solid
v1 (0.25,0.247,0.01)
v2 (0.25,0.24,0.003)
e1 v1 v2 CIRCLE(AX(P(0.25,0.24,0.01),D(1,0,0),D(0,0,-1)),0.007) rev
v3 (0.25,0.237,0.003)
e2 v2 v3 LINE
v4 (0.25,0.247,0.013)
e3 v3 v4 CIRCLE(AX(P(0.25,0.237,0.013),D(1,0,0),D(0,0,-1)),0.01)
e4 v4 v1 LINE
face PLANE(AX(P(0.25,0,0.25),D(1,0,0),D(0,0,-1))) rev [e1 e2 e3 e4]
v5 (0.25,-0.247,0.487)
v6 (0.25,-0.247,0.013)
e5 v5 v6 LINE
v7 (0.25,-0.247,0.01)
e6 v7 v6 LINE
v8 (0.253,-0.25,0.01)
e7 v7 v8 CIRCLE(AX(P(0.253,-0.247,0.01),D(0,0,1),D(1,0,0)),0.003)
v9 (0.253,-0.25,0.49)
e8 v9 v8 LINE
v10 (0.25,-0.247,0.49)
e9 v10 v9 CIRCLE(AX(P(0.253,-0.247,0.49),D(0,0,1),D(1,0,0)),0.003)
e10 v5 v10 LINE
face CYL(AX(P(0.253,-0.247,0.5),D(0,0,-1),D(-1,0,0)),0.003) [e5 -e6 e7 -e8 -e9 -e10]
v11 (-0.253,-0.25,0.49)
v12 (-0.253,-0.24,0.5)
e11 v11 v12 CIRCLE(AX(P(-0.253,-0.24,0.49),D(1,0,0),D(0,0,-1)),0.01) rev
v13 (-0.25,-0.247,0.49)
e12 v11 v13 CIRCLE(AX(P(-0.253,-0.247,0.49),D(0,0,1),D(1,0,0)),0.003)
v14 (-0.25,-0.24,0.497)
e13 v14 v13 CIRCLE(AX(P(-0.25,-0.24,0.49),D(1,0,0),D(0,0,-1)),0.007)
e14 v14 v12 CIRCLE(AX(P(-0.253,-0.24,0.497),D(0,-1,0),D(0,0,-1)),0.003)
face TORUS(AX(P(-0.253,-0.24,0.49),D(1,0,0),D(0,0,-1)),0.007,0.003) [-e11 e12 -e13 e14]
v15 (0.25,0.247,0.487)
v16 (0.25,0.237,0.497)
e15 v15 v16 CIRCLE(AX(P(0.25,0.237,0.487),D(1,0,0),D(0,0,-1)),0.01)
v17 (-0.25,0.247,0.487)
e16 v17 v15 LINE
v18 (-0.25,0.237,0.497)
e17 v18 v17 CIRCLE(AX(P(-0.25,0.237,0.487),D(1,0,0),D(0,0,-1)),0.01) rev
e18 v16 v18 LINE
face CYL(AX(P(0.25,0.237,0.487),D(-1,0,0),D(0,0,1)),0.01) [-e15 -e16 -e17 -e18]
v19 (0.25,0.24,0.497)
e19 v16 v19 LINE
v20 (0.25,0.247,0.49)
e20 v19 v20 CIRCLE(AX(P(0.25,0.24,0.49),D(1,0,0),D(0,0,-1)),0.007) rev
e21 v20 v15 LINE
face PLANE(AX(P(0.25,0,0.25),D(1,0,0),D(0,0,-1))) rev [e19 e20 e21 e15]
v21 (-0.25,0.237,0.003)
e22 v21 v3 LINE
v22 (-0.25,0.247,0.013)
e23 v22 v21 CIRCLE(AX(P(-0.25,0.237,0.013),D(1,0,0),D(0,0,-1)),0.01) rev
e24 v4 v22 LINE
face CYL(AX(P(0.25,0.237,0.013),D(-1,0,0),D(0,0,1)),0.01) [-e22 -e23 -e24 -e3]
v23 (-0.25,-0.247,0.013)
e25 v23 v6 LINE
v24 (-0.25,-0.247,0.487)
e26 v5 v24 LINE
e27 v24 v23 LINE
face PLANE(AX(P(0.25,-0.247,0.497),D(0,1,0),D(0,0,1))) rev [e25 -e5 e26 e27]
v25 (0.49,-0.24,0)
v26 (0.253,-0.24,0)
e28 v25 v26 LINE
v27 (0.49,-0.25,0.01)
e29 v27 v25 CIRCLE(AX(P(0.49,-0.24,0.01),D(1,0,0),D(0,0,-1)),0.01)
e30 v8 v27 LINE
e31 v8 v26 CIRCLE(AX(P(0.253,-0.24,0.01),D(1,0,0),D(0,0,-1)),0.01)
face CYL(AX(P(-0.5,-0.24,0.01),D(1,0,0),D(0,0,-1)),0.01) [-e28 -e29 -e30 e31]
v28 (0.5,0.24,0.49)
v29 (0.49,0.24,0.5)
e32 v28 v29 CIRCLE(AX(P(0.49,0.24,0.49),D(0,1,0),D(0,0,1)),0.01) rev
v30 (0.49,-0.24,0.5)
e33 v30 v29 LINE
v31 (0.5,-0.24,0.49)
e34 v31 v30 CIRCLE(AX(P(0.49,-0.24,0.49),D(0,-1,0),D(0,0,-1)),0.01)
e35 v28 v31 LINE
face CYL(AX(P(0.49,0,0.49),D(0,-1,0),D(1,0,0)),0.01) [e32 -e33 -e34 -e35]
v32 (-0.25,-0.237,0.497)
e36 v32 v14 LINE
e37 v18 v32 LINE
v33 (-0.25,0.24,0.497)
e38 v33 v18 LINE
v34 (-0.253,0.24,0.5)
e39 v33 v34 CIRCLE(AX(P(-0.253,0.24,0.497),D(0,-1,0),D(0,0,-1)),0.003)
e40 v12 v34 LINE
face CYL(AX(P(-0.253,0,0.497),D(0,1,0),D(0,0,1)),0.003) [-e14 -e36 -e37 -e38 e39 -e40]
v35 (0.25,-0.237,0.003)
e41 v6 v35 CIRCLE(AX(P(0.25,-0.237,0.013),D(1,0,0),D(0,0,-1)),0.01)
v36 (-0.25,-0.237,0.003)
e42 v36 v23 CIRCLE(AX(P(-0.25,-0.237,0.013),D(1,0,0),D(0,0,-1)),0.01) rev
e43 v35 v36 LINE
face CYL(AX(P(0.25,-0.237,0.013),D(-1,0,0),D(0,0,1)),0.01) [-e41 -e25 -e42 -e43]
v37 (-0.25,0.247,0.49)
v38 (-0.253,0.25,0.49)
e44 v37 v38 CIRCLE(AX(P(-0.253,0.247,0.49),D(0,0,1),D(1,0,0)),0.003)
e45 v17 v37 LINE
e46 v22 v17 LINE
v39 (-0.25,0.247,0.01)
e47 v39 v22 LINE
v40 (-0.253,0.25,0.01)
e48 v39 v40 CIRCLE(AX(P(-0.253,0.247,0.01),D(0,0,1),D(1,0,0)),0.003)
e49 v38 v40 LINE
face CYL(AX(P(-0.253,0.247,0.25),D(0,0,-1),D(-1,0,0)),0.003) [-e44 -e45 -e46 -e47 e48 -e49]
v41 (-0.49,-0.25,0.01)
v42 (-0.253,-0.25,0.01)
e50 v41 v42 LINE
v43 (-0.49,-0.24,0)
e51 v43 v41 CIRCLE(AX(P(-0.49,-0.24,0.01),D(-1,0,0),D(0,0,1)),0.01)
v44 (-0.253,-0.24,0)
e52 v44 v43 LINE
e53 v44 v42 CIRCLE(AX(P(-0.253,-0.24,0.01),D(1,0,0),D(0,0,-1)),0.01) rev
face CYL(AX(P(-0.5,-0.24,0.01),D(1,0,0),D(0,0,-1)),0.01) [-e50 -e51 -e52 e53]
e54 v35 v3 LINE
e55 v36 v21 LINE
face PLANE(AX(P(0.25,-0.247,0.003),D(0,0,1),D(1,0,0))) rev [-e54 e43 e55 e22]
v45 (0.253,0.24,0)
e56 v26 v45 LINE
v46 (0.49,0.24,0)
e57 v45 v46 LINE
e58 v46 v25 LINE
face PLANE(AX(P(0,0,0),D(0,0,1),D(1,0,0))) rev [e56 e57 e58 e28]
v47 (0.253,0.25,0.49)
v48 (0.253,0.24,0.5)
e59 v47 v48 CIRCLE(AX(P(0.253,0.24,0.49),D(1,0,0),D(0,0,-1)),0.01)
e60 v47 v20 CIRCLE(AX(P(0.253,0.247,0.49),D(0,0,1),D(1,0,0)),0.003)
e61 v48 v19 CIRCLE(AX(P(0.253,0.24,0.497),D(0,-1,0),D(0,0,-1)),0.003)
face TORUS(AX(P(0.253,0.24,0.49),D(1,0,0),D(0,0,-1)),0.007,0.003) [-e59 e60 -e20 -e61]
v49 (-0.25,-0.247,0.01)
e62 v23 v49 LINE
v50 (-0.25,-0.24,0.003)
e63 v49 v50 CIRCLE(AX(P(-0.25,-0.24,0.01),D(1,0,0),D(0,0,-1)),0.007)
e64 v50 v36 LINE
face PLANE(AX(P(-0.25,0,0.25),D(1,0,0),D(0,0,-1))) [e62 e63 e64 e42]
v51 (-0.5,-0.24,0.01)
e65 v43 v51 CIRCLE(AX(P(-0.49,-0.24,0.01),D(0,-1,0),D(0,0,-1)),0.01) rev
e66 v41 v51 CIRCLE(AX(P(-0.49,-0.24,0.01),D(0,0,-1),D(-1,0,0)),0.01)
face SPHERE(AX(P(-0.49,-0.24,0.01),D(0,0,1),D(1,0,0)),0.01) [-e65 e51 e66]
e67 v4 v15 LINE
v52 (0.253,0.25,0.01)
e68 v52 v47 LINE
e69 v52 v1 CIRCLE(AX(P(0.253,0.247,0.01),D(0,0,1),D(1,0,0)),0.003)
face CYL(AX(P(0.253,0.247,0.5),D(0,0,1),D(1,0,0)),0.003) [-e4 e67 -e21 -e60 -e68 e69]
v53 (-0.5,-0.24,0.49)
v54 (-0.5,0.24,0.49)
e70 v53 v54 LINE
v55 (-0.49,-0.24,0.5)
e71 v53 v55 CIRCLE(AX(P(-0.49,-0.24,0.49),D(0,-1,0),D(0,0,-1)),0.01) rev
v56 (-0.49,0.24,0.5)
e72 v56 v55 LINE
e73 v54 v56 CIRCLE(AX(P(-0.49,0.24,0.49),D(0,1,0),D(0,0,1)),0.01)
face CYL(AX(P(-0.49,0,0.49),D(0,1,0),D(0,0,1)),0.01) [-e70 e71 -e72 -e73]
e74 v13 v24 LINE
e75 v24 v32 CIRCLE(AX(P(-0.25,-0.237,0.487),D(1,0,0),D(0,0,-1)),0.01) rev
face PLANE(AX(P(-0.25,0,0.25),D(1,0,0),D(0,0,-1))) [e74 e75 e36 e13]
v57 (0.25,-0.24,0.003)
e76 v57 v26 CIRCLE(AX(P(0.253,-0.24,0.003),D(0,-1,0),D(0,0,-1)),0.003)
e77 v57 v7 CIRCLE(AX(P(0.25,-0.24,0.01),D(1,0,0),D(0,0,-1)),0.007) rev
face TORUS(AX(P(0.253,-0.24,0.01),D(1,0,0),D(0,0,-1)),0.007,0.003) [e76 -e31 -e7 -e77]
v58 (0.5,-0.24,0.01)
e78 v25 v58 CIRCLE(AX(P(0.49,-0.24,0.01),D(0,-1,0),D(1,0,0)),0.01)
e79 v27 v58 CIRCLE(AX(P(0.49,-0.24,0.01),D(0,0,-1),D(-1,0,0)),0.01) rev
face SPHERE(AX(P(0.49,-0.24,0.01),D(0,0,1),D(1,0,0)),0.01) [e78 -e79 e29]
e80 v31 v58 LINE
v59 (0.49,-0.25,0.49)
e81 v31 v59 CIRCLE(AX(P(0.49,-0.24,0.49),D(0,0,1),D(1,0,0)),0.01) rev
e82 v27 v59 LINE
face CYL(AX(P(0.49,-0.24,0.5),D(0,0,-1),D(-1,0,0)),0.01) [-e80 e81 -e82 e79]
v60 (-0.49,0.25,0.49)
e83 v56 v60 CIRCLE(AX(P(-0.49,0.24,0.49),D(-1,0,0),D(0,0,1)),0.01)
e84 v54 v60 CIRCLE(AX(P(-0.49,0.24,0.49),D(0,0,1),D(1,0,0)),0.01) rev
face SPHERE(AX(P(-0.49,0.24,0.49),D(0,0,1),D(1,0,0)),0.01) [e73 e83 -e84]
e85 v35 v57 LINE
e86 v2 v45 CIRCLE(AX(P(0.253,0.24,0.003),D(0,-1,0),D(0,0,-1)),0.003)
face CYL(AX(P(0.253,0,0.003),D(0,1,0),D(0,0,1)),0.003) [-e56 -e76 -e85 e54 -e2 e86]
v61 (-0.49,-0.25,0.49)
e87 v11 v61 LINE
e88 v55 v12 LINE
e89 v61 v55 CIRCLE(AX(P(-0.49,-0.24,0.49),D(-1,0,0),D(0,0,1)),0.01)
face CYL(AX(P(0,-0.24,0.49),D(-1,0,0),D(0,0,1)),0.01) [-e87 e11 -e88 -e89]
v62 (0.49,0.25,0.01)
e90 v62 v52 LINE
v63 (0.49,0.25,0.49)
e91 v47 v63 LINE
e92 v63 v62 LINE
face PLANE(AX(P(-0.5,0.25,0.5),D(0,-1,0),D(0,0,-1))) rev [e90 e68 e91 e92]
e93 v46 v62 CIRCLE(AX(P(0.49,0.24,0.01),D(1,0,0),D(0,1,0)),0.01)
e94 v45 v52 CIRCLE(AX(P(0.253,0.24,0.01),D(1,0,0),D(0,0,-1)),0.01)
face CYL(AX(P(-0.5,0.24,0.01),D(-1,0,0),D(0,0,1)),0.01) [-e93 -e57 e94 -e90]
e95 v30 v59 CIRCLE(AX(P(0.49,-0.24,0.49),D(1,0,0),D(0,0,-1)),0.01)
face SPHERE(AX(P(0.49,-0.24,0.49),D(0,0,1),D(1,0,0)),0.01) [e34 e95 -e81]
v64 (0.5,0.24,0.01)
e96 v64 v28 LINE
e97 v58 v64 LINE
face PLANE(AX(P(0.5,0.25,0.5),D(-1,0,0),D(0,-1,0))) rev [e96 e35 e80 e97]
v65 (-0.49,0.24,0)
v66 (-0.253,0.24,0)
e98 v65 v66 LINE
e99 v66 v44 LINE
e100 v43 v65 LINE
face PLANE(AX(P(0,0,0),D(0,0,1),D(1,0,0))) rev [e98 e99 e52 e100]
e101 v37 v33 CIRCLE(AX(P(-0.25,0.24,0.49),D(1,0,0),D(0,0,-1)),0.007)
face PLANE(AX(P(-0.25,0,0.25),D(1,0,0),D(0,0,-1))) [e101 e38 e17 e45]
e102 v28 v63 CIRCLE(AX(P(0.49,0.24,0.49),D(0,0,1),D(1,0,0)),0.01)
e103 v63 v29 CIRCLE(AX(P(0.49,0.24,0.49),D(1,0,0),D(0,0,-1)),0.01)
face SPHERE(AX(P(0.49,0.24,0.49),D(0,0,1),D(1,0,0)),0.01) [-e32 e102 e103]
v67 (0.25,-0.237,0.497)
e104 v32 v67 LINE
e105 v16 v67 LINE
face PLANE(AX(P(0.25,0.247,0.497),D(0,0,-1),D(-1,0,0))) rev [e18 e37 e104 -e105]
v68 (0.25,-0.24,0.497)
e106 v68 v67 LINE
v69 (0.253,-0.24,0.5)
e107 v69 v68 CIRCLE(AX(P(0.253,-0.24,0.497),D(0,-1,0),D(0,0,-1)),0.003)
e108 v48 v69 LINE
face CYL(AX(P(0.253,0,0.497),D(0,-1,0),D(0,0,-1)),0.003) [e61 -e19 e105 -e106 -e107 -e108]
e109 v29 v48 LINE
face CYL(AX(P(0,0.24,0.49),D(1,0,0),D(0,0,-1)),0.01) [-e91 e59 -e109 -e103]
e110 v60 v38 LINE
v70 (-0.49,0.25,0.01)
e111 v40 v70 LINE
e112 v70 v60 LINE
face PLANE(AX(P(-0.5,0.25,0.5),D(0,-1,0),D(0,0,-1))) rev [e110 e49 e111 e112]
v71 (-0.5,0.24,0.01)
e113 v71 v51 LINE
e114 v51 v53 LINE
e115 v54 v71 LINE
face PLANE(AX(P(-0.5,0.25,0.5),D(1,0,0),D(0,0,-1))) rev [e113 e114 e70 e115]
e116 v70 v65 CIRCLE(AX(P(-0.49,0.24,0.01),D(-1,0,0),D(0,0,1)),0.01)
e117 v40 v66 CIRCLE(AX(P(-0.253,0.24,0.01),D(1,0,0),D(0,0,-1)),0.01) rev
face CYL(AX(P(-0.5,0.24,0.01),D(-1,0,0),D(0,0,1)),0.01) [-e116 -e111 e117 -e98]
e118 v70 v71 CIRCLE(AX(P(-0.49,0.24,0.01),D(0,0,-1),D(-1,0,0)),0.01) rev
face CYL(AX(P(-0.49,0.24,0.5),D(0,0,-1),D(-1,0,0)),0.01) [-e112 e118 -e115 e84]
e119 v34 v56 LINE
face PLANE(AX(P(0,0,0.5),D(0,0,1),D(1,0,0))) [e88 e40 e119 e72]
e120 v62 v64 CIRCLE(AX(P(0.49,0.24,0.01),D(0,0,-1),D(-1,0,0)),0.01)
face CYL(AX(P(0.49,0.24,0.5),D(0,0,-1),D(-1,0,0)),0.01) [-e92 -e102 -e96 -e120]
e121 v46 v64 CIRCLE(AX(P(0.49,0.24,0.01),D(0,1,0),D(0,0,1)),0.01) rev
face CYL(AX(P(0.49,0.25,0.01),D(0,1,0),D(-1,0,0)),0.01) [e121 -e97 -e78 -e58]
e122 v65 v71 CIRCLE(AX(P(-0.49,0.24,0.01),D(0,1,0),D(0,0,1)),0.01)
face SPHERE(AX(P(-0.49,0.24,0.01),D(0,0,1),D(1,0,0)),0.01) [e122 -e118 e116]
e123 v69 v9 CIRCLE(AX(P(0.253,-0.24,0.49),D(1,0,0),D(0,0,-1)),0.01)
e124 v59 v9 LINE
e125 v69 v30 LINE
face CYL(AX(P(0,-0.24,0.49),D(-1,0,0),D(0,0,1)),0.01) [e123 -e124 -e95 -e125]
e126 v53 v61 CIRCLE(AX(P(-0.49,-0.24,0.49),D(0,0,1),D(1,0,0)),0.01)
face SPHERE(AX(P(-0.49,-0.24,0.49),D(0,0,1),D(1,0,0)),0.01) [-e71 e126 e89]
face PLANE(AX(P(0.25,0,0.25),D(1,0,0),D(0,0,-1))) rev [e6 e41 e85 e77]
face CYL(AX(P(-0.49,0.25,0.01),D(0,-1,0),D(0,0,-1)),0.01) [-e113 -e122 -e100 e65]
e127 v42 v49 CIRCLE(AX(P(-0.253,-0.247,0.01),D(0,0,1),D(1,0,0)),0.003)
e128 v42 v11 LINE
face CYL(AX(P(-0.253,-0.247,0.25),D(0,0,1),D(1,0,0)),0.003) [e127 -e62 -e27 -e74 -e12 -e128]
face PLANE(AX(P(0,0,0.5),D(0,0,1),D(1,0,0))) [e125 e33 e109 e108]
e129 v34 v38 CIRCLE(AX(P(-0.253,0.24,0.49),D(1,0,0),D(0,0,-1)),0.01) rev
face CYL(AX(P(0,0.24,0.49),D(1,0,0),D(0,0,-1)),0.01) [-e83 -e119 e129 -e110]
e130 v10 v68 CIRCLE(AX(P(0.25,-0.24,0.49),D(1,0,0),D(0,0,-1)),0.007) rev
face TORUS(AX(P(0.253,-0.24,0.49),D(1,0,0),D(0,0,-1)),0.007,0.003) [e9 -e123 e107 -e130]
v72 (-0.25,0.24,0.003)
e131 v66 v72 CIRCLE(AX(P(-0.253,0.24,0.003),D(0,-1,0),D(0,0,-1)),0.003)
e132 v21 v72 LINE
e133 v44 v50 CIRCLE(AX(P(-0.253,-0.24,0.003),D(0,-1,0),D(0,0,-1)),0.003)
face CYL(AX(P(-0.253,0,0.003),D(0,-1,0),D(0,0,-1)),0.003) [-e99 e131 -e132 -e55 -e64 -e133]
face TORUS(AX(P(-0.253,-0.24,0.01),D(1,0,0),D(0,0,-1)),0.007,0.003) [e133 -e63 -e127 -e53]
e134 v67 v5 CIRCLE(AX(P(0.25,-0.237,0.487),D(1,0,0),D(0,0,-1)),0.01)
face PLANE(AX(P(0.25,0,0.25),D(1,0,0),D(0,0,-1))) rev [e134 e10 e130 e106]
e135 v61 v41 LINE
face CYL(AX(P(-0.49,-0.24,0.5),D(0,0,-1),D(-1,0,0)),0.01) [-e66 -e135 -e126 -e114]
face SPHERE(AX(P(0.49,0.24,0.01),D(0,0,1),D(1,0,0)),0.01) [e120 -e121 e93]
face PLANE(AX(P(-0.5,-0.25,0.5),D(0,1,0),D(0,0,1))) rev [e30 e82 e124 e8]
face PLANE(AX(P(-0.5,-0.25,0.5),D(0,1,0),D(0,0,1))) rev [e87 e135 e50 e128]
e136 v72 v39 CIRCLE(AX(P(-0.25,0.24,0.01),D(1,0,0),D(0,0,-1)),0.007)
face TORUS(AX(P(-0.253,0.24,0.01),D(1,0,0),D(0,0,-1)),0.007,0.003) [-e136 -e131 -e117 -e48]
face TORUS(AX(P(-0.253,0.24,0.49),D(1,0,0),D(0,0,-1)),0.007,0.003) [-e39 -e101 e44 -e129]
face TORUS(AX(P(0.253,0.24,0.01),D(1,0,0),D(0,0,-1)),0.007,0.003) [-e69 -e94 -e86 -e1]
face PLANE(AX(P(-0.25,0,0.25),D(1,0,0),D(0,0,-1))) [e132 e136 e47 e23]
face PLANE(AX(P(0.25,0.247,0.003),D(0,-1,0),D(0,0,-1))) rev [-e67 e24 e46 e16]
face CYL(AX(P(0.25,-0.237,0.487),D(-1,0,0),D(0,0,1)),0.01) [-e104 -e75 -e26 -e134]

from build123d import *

# Parameters (mm, degrees)
SKETCH1_W                           = 1
SKETCH1_H                           = 0.5
ALL_BODY_DEPTH                      = 0.5
CUT_OUT_THE_BODY_FOR_PIN_DEPTH      = 0.25
CUT_OUT_THE_BODY_FOR_PIN_DEPTH_BACK = 0.25
SKETCH2_OUTSIDE_W                   = 2.744
SKETCH2_OUTSIDE_H                   = 2.744
SKETCH2_OUTSIDE_W_2                 = 0.494
SKETCH2_OUTSIDE_H_2                 = 0.494
BODY_FILLET_R                       = 0.01
PIN_FILLET_A_R                      = 0.01
PIN_FILLET_B_R                      = 0.003


with BuildPart() as part:
    # Sketch1 → All body (new body)
    with BuildSketch(Plane.XY):
        Rectangle(SKETCH1_W, SKETCH1_H)
    extrude(amount=ALL_BODY_DEPTH)

    # Sketch2 outside → Cut out the body for pin (cut, two sides: drawn at the far end of the back side and taken through both)
    with BuildSketch(Plane(origin=(0, 0, 0), x_dir=(0, 0, -1), z_dir=(1, 0, 0)).offset(-CUT_OUT_THE_BODY_FOR_PIN_DEPTH_BACK)):
        with Locations((-0.25, 0)):
            Rectangle(SKETCH2_OUTSIDE_W, SKETCH2_OUTSIDE_H)
        with Locations((-0.25, 0)):
            Rectangle(SKETCH2_OUTSIDE_W_2, SKETCH2_OUTSIDE_H_2, mode=Mode.SUBTRACT)
    extrude(amount=CUT_OUT_THE_BODY_FOR_PIN_DEPTH + CUT_OUT_THE_BODY_FOR_PIN_DEPTH_BACK, mode=Mode.SUBTRACT)

    # Body fillet
    body_fillet_edges = [part.edges().sort_by_distance(p)[0] for p in [
        (0, 0.247, 0.003),
        (0, 0.247, 0.497),
        (0, -0.247, 0.497),
        (0, -0.247, 0.003),
    ]]
    fillet(body_fillet_edges, radius=BODY_FILLET_R)

    # Pin fillet a
    pin_fillet_a_edges = [part.edges().sort_by_distance(p)[0] for p in [
        (0.5, 0, 0.5),
        (-0.375, 0.25, 0),
        (0.375, -0.25, 0),
        (0.375, -0.25, 0.5),
        (-0.375, 0.25, 0.5),
        (0.375, 0.25, 0.5),
        (-0.5, 0, 0.5),
        (0.375, 0.25, 0),
        (0.5, 0, 0),
        (-0.375, -0.25, 0),
        (-0.5, 0, 0),
        (-0.5, 0.25, 0.25),
        (0.5, 0.25, 0.25),
        (0.5, -0.25, 0.25),
        (-0.5, -0.25, 0.25),
        (-0.375, -0.25, 0.5),
    ]]
    fillet(pin_fillet_a_edges, radius=PIN_FILLET_A_R)

    # Pin fillet b
    pin_fillet_b_edges = [part.edges().sort_by_distance(p)[0] for p in [
        (0.25, -0.25, 0.25),
        (0.25, 0, 0.5),
        (0.25, 0.25, 0.25),
        (0.25, 0, 0),
        (-0.25, 0.25, 0.25),
        (-0.25, 0, 0.5),
        (-0.25, -0.25, 0.25),
        (-0.25, 0, 0),
        (0.25, 0.247071068, 0.002928932),
        (0.25, -0.247071068, 0.002928932),
        (0.25, -0.247071068, 0.497071068),
        (0.25, 0.247071068, 0.497071068),
        (-0.25, -0.247071068, 0.497071068),
        (-0.25, 0.247071068, 0.497071068),
        (-0.25, -0.247071068, 0.002928932),
        (-0.25, 0.247071068, 0.002928932),
    ]]
    fillet(pin_fillet_b_edges, radius=PIN_FILLET_B_R - 0.0001)  # a hair under: the kernel refuses the full size


solid = part.part
